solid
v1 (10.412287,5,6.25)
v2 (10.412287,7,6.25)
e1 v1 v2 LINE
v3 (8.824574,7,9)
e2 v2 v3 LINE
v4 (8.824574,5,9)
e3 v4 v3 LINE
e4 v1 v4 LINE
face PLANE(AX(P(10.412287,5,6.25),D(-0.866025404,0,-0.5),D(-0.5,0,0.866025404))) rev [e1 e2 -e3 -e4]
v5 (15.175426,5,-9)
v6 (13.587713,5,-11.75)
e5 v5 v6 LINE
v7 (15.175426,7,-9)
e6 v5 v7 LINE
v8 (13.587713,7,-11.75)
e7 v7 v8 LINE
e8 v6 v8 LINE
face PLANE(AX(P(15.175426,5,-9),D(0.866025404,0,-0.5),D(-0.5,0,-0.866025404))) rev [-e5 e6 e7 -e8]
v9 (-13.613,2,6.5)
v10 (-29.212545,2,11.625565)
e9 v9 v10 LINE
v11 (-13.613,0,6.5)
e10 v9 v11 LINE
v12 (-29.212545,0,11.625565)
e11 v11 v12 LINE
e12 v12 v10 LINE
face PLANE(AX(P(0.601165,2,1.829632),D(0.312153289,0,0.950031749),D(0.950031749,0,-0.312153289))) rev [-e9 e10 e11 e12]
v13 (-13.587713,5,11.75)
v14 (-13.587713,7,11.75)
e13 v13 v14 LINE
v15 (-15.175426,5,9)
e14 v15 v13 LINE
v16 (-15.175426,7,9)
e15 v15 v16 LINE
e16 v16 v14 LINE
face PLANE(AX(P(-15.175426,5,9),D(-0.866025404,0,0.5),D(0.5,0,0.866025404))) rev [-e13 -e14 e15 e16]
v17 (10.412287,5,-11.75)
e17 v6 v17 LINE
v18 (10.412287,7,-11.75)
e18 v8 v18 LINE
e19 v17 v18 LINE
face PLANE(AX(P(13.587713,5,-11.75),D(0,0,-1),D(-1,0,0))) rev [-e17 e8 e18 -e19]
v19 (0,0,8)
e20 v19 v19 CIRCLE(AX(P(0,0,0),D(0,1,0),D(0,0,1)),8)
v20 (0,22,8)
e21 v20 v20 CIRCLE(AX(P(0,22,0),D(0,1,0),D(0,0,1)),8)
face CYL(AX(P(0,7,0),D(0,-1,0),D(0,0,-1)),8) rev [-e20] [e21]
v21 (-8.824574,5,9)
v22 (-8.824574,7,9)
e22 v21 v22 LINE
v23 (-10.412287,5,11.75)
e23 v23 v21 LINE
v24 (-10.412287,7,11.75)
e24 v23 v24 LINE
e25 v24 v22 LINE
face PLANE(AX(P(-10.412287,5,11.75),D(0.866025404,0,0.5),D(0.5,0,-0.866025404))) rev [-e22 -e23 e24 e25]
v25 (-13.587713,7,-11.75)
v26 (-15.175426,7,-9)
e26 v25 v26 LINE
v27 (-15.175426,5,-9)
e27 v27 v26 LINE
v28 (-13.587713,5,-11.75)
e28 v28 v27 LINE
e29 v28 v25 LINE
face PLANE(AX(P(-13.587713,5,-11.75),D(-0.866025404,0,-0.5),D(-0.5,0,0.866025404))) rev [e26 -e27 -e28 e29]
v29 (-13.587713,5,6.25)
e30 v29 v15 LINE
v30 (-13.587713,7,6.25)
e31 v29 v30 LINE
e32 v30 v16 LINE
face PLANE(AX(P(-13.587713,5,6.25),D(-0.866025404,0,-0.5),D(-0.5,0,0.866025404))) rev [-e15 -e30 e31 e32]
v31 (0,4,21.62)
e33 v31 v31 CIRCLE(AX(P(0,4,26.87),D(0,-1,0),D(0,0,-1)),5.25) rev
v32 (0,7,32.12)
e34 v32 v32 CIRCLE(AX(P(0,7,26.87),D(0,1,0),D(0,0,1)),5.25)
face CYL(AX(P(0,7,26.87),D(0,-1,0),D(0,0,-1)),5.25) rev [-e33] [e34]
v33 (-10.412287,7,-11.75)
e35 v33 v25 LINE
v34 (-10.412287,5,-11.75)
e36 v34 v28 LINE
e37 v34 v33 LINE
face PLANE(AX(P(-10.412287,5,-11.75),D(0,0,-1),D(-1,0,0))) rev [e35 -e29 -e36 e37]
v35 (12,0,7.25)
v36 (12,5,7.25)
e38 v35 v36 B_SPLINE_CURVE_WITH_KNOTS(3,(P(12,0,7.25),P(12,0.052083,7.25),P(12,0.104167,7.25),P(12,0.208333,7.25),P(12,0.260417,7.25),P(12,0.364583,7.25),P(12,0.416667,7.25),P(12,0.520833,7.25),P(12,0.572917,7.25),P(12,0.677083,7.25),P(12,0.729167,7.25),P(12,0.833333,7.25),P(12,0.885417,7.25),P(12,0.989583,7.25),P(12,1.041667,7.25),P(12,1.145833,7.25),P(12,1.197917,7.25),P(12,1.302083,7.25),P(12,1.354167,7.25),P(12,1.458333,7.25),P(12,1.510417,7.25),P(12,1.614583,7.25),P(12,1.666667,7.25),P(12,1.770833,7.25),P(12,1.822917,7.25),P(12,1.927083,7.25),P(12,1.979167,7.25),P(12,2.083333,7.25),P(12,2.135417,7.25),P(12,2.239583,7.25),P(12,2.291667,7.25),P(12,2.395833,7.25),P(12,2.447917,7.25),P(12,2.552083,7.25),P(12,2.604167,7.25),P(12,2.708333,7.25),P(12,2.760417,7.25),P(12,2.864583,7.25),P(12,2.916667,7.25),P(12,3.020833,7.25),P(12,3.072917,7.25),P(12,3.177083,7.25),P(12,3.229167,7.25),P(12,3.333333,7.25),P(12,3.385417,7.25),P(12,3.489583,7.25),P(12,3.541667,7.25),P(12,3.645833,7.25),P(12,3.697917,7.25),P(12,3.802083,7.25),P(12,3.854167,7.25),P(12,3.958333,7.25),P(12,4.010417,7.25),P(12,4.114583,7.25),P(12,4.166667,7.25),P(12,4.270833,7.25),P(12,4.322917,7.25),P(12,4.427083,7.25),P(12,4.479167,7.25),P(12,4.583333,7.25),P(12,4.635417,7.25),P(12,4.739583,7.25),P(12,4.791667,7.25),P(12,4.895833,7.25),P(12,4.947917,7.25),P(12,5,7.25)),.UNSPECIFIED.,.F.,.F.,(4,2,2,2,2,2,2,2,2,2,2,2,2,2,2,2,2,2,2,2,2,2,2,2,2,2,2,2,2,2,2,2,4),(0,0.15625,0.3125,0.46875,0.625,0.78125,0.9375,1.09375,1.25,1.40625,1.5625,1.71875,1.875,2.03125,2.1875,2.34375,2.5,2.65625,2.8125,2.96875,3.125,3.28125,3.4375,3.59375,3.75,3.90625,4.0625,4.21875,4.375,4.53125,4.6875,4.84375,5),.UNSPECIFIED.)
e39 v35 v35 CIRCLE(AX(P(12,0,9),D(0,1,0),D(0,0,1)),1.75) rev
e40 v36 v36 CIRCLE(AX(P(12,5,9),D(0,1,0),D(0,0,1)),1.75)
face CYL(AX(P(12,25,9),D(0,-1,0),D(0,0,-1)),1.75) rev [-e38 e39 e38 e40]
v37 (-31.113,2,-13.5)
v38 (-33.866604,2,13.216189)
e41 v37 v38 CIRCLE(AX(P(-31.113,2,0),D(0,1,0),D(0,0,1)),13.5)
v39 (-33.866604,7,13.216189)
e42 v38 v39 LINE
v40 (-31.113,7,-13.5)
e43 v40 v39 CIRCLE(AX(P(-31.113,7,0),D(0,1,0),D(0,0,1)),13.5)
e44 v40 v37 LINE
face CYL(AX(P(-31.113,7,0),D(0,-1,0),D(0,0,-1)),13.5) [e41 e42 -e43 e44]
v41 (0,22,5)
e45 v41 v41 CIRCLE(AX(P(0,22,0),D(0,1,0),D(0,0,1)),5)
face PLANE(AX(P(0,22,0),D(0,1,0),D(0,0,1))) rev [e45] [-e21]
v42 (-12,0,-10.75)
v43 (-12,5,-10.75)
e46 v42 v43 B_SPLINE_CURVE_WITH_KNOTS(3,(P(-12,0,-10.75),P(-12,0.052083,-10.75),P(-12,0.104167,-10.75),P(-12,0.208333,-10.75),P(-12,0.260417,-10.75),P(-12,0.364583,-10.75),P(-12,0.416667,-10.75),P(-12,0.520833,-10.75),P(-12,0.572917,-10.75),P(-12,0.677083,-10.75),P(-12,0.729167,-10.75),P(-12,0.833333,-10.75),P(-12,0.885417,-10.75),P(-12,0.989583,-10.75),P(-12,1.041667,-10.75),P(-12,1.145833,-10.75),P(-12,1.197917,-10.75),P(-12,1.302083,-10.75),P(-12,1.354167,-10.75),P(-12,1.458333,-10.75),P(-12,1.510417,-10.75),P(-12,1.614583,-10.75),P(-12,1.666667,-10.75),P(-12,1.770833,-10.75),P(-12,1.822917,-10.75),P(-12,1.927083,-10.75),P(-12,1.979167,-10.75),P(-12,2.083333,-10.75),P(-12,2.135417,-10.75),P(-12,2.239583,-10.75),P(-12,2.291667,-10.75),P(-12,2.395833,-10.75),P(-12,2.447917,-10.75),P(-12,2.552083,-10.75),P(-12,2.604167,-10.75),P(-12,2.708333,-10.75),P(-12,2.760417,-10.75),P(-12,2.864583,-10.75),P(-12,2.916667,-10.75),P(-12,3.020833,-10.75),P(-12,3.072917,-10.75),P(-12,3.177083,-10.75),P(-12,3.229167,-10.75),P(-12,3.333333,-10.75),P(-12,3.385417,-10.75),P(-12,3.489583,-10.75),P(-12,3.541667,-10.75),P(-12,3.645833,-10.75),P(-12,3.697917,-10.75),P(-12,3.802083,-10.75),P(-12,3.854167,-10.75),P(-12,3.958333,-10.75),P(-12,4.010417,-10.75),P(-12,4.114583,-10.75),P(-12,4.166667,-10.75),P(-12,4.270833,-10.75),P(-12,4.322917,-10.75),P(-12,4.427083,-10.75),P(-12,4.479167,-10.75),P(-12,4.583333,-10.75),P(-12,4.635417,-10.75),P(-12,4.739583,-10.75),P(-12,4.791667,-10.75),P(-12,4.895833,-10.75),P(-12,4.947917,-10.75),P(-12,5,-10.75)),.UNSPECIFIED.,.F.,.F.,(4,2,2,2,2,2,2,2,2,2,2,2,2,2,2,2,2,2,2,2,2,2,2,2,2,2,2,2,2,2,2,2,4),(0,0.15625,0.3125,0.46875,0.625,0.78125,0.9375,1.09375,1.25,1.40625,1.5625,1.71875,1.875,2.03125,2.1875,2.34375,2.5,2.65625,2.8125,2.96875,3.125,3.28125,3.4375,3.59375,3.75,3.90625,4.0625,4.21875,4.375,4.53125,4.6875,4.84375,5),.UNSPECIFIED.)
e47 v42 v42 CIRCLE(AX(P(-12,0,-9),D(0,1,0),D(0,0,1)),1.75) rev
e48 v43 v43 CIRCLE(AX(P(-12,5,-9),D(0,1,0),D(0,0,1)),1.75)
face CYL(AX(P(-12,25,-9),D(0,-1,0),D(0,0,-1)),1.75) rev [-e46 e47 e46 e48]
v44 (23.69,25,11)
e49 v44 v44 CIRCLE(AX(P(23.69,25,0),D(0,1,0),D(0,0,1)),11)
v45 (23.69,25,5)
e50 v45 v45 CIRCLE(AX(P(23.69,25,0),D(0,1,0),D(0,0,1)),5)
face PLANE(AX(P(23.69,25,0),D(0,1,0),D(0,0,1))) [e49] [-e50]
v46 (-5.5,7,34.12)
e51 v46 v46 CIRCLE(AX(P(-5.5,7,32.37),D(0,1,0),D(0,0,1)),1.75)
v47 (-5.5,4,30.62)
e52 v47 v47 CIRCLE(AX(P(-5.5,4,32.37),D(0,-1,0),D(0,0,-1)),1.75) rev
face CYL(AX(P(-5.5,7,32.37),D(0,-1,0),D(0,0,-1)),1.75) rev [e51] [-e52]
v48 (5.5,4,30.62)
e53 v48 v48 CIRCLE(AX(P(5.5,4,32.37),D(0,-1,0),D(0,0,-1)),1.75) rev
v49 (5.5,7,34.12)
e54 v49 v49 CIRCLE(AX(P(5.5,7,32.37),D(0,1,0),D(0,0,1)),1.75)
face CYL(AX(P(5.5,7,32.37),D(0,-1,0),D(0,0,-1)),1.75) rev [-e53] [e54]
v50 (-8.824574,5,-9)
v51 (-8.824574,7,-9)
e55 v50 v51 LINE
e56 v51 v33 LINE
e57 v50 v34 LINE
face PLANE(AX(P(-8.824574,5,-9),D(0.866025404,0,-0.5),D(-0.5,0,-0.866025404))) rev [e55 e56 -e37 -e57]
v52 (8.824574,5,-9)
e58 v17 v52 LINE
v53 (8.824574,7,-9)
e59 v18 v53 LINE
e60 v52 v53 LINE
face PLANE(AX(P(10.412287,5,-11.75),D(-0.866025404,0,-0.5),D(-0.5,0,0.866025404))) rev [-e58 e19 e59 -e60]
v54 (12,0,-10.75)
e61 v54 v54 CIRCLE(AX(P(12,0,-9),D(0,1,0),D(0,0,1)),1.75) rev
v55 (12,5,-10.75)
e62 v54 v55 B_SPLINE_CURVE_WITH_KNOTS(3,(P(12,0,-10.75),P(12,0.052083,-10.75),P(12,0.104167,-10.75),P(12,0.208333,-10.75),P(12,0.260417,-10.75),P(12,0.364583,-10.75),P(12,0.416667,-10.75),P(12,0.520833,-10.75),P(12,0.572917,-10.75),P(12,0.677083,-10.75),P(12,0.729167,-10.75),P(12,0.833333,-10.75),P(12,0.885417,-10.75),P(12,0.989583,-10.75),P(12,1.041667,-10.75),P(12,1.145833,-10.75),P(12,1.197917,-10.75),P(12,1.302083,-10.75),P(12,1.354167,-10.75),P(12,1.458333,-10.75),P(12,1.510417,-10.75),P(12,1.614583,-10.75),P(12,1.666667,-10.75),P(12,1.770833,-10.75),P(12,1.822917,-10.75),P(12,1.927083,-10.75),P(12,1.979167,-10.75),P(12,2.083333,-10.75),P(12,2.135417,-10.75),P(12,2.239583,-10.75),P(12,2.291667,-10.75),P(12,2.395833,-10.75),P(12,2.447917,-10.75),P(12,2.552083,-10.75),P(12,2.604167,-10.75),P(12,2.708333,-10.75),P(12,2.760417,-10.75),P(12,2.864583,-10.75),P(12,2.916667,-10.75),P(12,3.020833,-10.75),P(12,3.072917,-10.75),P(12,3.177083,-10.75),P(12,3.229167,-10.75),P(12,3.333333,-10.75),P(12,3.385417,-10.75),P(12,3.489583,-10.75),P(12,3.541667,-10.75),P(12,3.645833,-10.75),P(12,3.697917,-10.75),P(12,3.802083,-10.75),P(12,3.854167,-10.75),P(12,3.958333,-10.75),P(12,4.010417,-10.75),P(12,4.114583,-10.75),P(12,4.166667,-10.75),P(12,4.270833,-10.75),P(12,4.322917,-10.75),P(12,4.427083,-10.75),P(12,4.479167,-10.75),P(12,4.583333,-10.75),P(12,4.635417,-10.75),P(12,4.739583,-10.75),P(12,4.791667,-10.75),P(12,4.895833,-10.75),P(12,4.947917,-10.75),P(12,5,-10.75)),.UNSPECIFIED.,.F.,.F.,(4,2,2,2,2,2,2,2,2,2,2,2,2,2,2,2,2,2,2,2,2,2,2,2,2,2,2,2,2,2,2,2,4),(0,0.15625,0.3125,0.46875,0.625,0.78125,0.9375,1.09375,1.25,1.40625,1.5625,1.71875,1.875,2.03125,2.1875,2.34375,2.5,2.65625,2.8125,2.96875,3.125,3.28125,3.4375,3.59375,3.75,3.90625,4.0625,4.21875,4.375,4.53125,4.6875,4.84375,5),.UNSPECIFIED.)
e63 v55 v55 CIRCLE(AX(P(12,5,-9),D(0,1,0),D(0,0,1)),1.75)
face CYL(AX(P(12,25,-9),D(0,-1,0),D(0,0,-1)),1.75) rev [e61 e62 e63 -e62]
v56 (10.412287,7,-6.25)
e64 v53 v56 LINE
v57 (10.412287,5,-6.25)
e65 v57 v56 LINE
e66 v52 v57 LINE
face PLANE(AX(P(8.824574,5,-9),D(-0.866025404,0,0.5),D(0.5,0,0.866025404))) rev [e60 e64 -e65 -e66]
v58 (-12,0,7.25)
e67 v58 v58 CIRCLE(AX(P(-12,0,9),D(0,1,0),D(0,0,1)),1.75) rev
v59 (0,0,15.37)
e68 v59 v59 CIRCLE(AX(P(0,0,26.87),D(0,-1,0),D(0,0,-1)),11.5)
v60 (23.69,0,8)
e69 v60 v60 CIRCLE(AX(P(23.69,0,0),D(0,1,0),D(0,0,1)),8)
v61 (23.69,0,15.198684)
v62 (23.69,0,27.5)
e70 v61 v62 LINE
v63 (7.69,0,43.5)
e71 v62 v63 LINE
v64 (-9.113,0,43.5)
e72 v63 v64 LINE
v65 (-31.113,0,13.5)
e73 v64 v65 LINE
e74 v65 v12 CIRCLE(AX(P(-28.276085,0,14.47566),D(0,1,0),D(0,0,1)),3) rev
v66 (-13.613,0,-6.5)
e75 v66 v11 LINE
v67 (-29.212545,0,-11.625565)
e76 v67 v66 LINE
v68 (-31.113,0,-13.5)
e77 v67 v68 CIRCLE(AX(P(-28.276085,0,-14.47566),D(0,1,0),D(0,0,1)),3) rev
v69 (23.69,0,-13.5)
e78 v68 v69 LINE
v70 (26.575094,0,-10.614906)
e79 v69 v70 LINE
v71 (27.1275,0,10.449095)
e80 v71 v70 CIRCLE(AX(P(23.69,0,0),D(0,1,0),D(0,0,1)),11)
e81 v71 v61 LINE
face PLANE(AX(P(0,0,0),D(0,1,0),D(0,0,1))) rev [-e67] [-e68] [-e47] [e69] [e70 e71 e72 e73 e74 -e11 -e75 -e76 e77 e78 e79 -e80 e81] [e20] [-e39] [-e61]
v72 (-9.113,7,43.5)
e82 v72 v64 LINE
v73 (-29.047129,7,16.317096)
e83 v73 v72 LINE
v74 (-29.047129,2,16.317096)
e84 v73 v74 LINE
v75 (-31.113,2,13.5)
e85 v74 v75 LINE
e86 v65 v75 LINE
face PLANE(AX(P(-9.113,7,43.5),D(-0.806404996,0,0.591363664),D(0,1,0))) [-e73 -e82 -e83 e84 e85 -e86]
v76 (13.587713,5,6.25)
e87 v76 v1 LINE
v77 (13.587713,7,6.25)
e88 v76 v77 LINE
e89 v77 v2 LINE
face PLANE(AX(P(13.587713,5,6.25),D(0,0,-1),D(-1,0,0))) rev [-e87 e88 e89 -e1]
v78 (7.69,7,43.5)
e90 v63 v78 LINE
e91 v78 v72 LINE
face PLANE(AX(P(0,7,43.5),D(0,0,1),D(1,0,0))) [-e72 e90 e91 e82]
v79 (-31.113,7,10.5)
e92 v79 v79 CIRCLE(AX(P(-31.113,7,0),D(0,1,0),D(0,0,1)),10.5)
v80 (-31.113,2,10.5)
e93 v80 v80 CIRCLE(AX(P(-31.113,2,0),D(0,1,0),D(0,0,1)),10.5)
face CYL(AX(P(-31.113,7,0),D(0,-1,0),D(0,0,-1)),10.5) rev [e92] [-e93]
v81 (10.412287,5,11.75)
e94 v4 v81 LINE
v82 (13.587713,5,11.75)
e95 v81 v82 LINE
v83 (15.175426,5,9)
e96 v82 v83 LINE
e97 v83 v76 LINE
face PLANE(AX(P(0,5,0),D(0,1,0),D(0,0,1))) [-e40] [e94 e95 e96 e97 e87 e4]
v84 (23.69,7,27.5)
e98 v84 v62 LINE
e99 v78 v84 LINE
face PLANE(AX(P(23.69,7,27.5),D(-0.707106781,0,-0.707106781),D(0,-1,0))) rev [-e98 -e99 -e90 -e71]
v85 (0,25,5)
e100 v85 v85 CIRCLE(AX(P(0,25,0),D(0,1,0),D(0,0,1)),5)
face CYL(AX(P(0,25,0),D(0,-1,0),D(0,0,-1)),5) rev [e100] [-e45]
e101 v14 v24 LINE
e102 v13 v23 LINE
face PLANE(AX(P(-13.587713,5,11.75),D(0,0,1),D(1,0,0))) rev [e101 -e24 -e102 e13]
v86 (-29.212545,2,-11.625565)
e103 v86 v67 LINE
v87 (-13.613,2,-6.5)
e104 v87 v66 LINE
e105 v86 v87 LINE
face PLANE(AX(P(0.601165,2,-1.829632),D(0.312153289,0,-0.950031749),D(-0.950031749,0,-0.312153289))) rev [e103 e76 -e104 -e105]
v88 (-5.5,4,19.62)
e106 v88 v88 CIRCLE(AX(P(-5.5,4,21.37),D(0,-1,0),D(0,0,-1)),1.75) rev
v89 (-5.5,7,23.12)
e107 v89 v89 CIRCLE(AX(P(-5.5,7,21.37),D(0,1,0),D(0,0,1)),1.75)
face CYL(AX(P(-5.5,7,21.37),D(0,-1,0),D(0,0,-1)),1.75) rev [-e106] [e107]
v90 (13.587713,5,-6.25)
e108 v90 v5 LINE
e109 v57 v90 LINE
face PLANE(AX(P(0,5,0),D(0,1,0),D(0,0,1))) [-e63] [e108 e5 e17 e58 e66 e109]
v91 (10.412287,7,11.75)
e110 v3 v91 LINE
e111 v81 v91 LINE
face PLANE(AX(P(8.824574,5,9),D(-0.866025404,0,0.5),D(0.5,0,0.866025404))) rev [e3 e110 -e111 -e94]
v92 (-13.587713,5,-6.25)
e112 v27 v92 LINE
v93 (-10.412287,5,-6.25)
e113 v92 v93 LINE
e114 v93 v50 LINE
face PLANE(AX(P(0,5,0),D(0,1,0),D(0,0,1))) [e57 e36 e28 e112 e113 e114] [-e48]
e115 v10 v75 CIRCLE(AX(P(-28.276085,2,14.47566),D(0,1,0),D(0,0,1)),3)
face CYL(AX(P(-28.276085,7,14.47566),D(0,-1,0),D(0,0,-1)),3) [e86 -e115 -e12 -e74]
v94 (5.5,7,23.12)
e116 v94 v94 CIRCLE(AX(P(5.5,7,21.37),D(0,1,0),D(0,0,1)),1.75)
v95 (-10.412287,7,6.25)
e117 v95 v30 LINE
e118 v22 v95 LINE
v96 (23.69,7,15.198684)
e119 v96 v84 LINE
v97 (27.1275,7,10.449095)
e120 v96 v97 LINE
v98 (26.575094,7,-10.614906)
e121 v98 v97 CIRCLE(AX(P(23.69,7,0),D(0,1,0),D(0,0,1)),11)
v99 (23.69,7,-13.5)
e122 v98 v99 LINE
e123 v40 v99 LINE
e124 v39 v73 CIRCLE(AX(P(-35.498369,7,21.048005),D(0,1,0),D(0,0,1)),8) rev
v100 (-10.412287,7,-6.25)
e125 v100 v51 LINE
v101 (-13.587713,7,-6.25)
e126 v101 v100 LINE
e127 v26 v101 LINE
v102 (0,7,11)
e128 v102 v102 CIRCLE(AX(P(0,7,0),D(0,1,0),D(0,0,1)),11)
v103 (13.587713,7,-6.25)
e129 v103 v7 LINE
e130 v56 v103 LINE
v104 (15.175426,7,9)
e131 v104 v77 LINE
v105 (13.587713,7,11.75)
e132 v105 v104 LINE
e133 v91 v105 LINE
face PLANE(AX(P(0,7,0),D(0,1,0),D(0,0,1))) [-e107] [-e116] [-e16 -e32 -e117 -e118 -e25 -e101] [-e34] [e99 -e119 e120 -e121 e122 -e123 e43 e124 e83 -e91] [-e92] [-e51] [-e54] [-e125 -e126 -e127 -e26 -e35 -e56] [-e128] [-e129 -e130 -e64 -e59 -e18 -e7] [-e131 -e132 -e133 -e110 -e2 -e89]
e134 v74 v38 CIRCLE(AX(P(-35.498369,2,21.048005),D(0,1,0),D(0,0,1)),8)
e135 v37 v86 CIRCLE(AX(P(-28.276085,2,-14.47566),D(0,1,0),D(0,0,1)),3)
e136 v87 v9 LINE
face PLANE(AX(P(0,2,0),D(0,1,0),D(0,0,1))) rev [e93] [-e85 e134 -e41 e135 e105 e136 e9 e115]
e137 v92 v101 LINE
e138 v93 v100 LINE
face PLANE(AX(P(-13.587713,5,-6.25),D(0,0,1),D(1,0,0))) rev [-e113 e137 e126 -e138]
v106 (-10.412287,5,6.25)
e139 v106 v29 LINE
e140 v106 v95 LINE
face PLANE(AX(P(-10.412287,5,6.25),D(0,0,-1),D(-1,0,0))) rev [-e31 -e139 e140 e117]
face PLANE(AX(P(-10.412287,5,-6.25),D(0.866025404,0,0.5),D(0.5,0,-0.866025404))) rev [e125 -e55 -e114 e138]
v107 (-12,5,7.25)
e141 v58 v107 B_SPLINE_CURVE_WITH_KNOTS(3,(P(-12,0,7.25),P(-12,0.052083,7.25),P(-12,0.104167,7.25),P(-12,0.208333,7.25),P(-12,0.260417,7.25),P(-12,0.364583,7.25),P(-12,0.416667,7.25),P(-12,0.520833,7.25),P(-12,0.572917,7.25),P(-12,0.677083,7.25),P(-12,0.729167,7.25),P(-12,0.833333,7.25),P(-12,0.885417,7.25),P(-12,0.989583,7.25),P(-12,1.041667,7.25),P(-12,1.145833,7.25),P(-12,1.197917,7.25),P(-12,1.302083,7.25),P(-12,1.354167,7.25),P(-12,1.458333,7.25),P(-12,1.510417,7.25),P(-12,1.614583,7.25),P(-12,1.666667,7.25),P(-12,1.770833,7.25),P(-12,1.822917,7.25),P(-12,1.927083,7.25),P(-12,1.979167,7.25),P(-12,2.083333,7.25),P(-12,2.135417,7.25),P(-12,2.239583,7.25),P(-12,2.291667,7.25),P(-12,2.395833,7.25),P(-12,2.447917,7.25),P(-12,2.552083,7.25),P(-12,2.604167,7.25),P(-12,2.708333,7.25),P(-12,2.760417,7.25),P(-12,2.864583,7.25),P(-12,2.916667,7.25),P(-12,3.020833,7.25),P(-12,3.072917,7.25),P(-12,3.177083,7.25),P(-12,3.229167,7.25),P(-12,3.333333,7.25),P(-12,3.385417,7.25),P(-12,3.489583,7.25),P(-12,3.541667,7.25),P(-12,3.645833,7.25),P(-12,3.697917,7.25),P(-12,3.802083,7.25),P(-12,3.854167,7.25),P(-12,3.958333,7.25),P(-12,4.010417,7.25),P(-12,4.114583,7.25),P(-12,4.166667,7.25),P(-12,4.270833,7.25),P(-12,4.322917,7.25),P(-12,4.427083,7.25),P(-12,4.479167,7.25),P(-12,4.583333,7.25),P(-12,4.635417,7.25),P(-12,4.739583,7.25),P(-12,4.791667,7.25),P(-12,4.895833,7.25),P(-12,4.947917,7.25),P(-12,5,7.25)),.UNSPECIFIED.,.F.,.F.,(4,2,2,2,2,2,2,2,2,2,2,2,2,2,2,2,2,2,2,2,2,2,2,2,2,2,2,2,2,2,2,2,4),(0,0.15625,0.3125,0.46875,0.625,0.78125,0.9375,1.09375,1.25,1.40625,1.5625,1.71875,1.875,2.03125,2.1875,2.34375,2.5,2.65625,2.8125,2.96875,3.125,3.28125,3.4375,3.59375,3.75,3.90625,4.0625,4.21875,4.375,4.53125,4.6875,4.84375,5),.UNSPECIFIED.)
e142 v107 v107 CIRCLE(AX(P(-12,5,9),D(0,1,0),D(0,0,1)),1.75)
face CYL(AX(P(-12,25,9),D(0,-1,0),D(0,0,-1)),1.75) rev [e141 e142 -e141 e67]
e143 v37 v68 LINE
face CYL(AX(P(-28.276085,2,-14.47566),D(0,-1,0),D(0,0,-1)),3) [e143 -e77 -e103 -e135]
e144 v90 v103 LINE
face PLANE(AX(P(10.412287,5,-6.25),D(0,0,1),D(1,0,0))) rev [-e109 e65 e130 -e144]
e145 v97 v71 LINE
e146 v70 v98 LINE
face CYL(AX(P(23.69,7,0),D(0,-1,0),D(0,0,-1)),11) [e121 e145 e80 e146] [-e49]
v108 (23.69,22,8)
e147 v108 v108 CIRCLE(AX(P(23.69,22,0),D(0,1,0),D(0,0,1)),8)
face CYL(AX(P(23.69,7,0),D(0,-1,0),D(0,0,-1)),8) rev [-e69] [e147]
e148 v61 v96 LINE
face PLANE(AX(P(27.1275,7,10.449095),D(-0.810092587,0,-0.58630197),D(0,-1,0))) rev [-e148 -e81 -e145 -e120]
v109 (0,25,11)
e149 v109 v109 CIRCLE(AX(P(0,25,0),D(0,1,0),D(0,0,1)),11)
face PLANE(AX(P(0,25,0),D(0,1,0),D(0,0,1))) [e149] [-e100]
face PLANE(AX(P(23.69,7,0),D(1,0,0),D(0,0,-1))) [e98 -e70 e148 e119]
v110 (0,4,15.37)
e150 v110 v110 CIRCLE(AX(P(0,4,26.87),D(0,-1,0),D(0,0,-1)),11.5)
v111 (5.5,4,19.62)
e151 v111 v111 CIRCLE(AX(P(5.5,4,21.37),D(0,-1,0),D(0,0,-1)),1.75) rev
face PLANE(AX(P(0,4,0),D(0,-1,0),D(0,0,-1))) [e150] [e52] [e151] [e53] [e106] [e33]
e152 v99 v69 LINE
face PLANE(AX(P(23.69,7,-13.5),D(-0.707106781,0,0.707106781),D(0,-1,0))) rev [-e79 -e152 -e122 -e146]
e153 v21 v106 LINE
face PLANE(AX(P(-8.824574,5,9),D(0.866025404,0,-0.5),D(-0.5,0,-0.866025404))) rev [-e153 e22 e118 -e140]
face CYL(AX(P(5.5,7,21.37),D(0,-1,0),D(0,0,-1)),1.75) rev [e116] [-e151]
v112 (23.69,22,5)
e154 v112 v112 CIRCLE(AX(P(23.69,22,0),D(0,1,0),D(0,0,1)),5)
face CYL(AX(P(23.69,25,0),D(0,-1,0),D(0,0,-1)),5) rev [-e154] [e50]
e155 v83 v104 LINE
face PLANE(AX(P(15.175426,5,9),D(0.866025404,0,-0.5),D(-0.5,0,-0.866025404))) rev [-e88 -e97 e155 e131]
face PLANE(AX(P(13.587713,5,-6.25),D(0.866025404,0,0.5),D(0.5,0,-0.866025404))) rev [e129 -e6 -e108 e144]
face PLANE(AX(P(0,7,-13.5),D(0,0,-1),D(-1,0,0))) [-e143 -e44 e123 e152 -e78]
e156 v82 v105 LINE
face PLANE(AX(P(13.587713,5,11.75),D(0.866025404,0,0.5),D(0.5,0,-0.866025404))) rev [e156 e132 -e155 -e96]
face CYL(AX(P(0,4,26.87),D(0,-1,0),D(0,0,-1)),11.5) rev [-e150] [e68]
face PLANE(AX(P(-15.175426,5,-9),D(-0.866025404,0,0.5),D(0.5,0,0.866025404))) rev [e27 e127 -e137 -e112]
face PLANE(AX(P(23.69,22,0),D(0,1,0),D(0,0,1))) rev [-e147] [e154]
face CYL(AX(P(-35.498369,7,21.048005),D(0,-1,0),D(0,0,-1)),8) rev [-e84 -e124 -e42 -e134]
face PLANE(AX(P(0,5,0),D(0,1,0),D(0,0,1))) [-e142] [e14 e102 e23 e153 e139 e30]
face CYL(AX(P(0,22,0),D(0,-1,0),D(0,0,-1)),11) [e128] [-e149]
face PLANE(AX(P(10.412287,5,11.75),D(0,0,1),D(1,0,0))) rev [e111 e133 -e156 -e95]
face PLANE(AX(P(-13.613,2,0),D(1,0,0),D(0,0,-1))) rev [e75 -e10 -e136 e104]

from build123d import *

# Parameters (mm, degrees)
SKETCH3_R               = 8
SKETCH3_W               = 54.803
SKETCH3_H               = 30
SKETCH3_R_2             = 5.25
BOSS_EXTRUDE1_DEPTH     = 7
CUT_EXTRUDE3_DEPTH      = 63.702230973
CUT_EXTRUDE3_DEPTH_BACK = 63.702230973
SKETCH4_R               = 1.75
SKETCH6_R               = 11
SKETCH6_R_2             = 8
BOSS_EXTRUDE2_DEPTH     = 15
SKETCH7_R               = 11
SKETCH7_R_2             = 5
BOSS_EXTRUDE3_DEPTH     = 3
CHAMFER1_SIZE           = 2.5
CUT_EXTRUDE4_DEPTH      = 2
CUT_EXTRUDE5_DEPTH      = 68.138437344
CUT_EXTRUDE5_DEPTH_BACK = 68.138437344
SKETCH9_R               = 1.75
CUT_EXTRUDE6_START      = -2
SKETCH10_R              = 1.75
CUT_EXTRUDE6_DEPTH      = 2
CHAMFER3_SIZE           = 30
CHAMFER3_SIZE2          = 22
CHAMFER4_SIZE           = 16
FILLET1_R               = 8
SKETCH14_R              = 11.5
SKETCH14_R_2            = 5.25
SKETCH14_R_3            = 1.75
CUT_EXTRUDE8_DEPTH      = 4
FILLET2_R               = 3


with BuildPart() as part:
    # Sketch3 → Boss-Extrude1 (new body)
    # profile 1 of 10: a face of its own
    with BuildSketch(Plane(origin=(0, 0, 0), x_dir=(1, 0, 0), z_dir=(0, 1, 0))):
        with BuildLine():
            ThreePointArc((-17.613, 0), (-21.567058454, 9.545941546), (-31.113, 13.5))
            Line((-31.113, 13.5), (-31.113, 10.5))
            ThreePointArc((-31.113, 10.5), (-23.688378798, 7.424621202), (-20.613, 0))
            ThreePointArc((-20.613, 0), (-23.688378798, -7.424621202), (-31.113, -10.5))
            Line((-31.113, -10.5), (-31.113, -13.5))
            ThreePointArc((-31.113, -13.5), (-21.567058454, -9.545941546), (-17.613, 0))
        make_face()
    # profile 2 of 10: a face of its own
    with BuildSketch(Plane(origin=(0, 0, 0), x_dir=(1, 0, 0), z_dir=(0, 1, 0))):
        with BuildLine():
            Line((-31.113, 10.5), (-31.113, 13.5))
            ThreePointArc((-31.113, 13.5), (-44.613, 0), (-31.113, -13.5))
            Line((-31.113, -13.5), (-31.113, -10.5))
            ThreePointArc((-31.113, -10.5), (-41.613, 0), (-31.113, 10.5))
        make_face()
    # profile 3 of 10: a face of its own
    with BuildSketch(Plane(origin=(0, 0, 0), x_dir=(1, 0, 0), z_dir=(0, 1, 0))):
        with BuildLine():
            Line((23.69, 13.5), (-31.113, 13.5))
            ThreePointArc((-31.113, 13.5), (-21.567058454, 9.545941546), (-17.613, 0))
            ThreePointArc((-17.613, 0), (-21.567058454, -9.545941546), (-31.113, -13.5))
            Line((-31.113, -13.5), (23.69, -13.5))
            Line((23.69, -13.5), (23.69, -11))
            ThreePointArc((23.69, -11), (12.69, 0), (23.69, 11))
            Line((23.69, 11), (23.69, 13.5))
        make_face()
        with Locations(Location((0, 0, 0), (0, 0, 270))):
            Circle(SKETCH3_R, mode=Mode.SUBTRACT)
    # profile 4 of 10: a face of its own
    with BuildSketch(Plane(origin=(0, 0, 0), x_dir=(1, 0, 0), z_dir=(0, 1, 0))):
        with BuildLine():
            ThreePointArc((-17.613, 0), (-21.567058454, 9.545941546), (-31.113, 13.5))
            Line((-31.113, 13.5), (-31.113, 10.5))
            ThreePointArc((-31.113, 10.5), (-23.688378798, 7.424621202), (-20.613, 0))
            ThreePointArc((-20.613, 0), (-23.688378798, -7.424621202), (-31.113, -10.5))
            Line((-31.113, -10.5), (-31.113, -13.5))
            ThreePointArc((-31.113, -13.5), (-21.567058454, -9.545941546), (-17.613, 0))
        make_face()
    # profile 5 of 10: a face of its own
    with BuildSketch(Plane(origin=(0, 0, 0), x_dir=(1, 0, 0), z_dir=(0, 1, 0))):
        with BuildLine():
            Line((-31.113, 10.5), (-31.113, 13.5))
            ThreePointArc((-31.113, 13.5), (-44.613, 0), (-31.113, -13.5))
            Line((-31.113, -13.5), (-31.113, -10.5))
            ThreePointArc((-31.113, -10.5), (-41.613, 0), (-31.113, 10.5))
        make_face()
    # profile 6 of 10: a face of its own
    with BuildSketch(Plane(origin=(0, 0, 0), x_dir=(1, 0, 0), z_dir=(0, 1, 0))):
        with BuildLine():
            ThreePointArc((34.69, 0), (31.468174593, 7.778174593), (23.69, 11))
            Line((23.69, 11), (23.69, 8))
            ThreePointArc((23.69, 8), (29.346854249, 5.656854249), (31.69, 0))
            ThreePointArc((31.69, 0), (29.346854249, -5.656854249), (23.69, -8))
            Line((23.69, -8), (23.69, -11))
            ThreePointArc((23.69, -11), (31.468174593, -7.778174593), (34.69, 0))
        make_face()
    # profile 7 of 10: a face of its own
    with BuildSketch(Plane(origin=(0, 0, 0), x_dir=(1, 0, 0), z_dir=(0, 1, 0))):
        with BuildLine():
            Line((23.69, 8), (23.69, 11))
            ThreePointArc((23.69, 11), (12.69, 0), (23.69, -11))
            Line((23.69, -11), (23.69, -8))
            ThreePointArc((23.69, -8), (15.69, 0), (23.69, 8))
        make_face()
    # profile 8 of 10: a face of its own
    with BuildSketch(Plane(origin=(0, 0, 0), x_dir=(1, 0, 0), z_dir=(0, 1, 0))):
        with Locations((-3.7115, -28.5)):
            Rectangle(SKETCH3_W, SKETCH3_H)
        with Locations(Location((0, -26.87, 0), (0, 0, 270))):
            Circle(SKETCH3_R_2, mode=Mode.SUBTRACT)
    # profile 9 of 10: a face of its own
    with BuildSketch(Plane(origin=(0, 0, 0), x_dir=(1, 0, 0), z_dir=(0, 1, 0))):
        with BuildLine():
            ThreePointArc((34.69, 0), (31.468174593, 7.778174593), (23.69, 11))
            Line((23.69, 11), (23.69, 8))
            ThreePointArc((23.69, 8), (29.346854249, 5.656854249), (31.69, 0))
            ThreePointArc((31.69, 0), (29.346854249, -5.656854249), (23.69, -8))
            Line((23.69, -8), (23.69, -11))
            ThreePointArc((23.69, -11), (31.468174593, -7.778174593), (34.69, 0))
        make_face()
    # profile 10 of 10: a face of its own
    with BuildSketch(Plane(origin=(0, 0, 0), x_dir=(1, 0, 0), z_dir=(0, 1, 0))):
        with BuildLine():
            Line((23.69, 8), (23.69, 11))
            ThreePointArc((23.69, 11), (12.69, 0), (23.69, -11))
            Line((23.69, -11), (23.69, -8))
            ThreePointArc((23.69, -8), (15.69, 0), (23.69, 8))
        make_face()
    extrude(amount=BOSS_EXTRUDE1_DEPTH)

    # Sketch4 → Cut-Extrude3 (cut, two sides: drawn at the far end of the back side and taken through both)
    with BuildSketch(Plane(origin=(0, 0, 0), x_dir=(1, 0, 0), z_dir=(0, 1, 0)).offset(-CUT_EXTRUDE3_DEPTH_BACK)):
        with Locations(Location((5.5, -21.37, 0), (0, 0, 270))):
            Circle(SKETCH4_R)
        with Locations(Location((5.5, -32.37, 0), (0, 0, 270))):
            Circle(SKETCH4_R)
        with Locations(Location((-5.5, -32.37, 0), (0, 0, 270))):
            Circle(SKETCH4_R)
        with Locations(Location((-5.5, -21.37, 0), (0, 0, 270))):
            Circle(SKETCH4_R)
    extrude(amount=CUT_EXTRUDE3_DEPTH + CUT_EXTRUDE3_DEPTH_BACK, mode=Mode.SUBTRACT)

    # Sketch6 → Boss-Extrude2 (add)
    # profile 1 of 2: a face of its own
    with BuildSketch(Plane(origin=(0, 7, 0), x_dir=(1, 0, 0), z_dir=(0, 1, 0))):
        with Locations(Location((23.69, 0, 0), (0, 0, 270))):
            Circle(SKETCH6_R)
        with Locations(Location((23.69, 0, 0), (0, 0, 270))):
            Circle(SKETCH6_R_2, mode=Mode.SUBTRACT)
    # profile 2 of 2: a face of its own
    with BuildSketch(Plane(origin=(0, 7, 0), x_dir=(1, 0, 0), z_dir=(0, 1, 0))):
        with Locations(Location((0, 0, 0), (0, 0, 270))):
            Circle(SKETCH6_R)
        with Locations(Location((0, 0, 0), (0, 0, 270))):
            Circle(SKETCH6_R_2, mode=Mode.SUBTRACT)
    extrude(amount=BOSS_EXTRUDE2_DEPTH)

    # Sketch7 → Boss-Extrude3 (add)
    # profile 1 of 2: a face of its own
    with BuildSketch(Plane(origin=(0, 22, 0), x_dir=(1, 0, 0), z_dir=(0, 1, 0))):
        with Locations(Location((23.69, 0, 0), (0, 0, 270))):
            Circle(SKETCH7_R)
        with Locations(Location((23.69, 0, 0), (0, 0, 270))):
            Circle(SKETCH7_R_2, mode=Mode.SUBTRACT)
    # profile 2 of 2: a face of its own
    with BuildSketch(Plane(origin=(0, 22, 0), x_dir=(1, 0, 0), z_dir=(0, 1, 0))):
        with Locations(Location((0, 0, 0), (0, 0, 270))):
            Circle(SKETCH7_R)
        with Locations(Location((0, 0, 0), (0, 0, 270))):
            Circle(SKETCH7_R_2, mode=Mode.SUBTRACT)
    extrude(amount=BOSS_EXTRUDE3_DEPTH)

    # Chamfer1
    # the kernel refuses this chamfer: 2.5 mm, written as the material it adds along each edge
    with BuildSketch(Plane(origin=(23.69, 0, -11), x_dir=(0.9912092295509807, 0, 0.13230367815352426), z_dir=(0, 1, 0))) as chamfer1_piece_1_section:
        with BuildLine():
            Line((2.910680919, 0), (-CHAMFER1_SIZE * 0.132303678154, CHAMFER1_SIZE * 0.991209229551))
            Line((-CHAMFER1_SIZE * 0.132303678154, CHAMFER1_SIZE * 0.991209229551), (0, 0))
            ThreePointArc((0, 0), (1.49552658, 0.096625069), (2.910680919, 0))
        make_face()
    chamfer1_piece_1 = extrude(amount=7, mode=Mode.PRIVATE)
    chamfer1_piece_1 = split(chamfer1_piece_1, bisect_by=Plane(origin=(23.69, 0, -13.5), z_dir=(0, 0, 1)), keep=Keep.TOP, mode=Mode.PRIVATE)
    add(chamfer1_piece_1)

    # Sketch8 → Cut-Extrude4 (cut)
    with BuildSketch(Plane(origin=(0, 0, 0), x_dir=(1, 0, 0), z_dir=(0, 1, 0))):
        Polygon((-31.113, -12.25), (-31.113, 0), (-31.113, 12.25), (-31.113, 13.5), (-51.113, 13.5), (-51.113, -13.5), (-31.113, -13.5), align=None)
        Polygon((-31.113, 12.25), (-31.113, 0), (-31.113, -12.25), (-13.613, -6.5), (-13.613, 6.5), align=None)
    extrude(amount=CUT_EXTRUDE4_DEPTH, mode=Mode.SUBTRACT)

    # Sketch9 → Cut-Extrude5 (cut, two sides: drawn at the far end of the back side and taken through both)
    with BuildSketch(Plane(origin=(0, 0, 0), x_dir=(1, 0, 0), z_dir=(0, 1, 0)).offset(-CUT_EXTRUDE5_DEPTH_BACK)):
        with Locations(Location((12, 9, 0), (0, 0, 90))):
            Circle(SKETCH9_R)
        with Locations(Location((12, -9, 0), (0, 0, 90))):
            Circle(SKETCH9_R)
        with Locations(Location((-12, -9, 0), (0, 0, 90))):
            Circle(SKETCH9_R)
        with Locations(Location((-12, 9, 0), (0, 0, 90))):
            Circle(SKETCH9_R)
    extrude(amount=CUT_EXTRUDE5_DEPTH + CUT_EXTRUDE5_DEPTH_BACK, mode=Mode.SUBTRACT)

    # Sketch10 → Cut-Extrude6 (cut)
    # profile 1 of 4: a face of its own
    with BuildSketch(Plane(origin=(0, 7, 0), x_dir=(1, 0, 0), z_dir=(0, 1, 0)).offset(CUT_EXTRUDE6_START)):
        Polygon((-15.175426481, -9), (-13.58771324, -11.75), (-10.41228676, -11.75), (-8.824573519, -9), (-10.41228676, -6.25), (-13.58771324, -6.25), align=None)
        with Locations(Location((-12, -9, 0), (0, 0, 90))):
            Circle(SKETCH10_R, mode=Mode.SUBTRACT)
    # profile 2 of 4: a face of its own
    with BuildSketch(Plane(origin=(0, 7, 0), x_dir=(1, 0, 0), z_dir=(0, 1, 0)).offset(CUT_EXTRUDE6_START)):
        Polygon((-15.175426481, 9), (-13.58771324, 6.25), (-10.41228676, 6.25), (-8.824573519, 9), (-10.41228676, 11.75), (-13.58771324, 11.75), align=None)
        with Locations(Location((-12, 9, 0), (0, 0, 90))):
            Circle(SKETCH10_R, mode=Mode.SUBTRACT)
    # profile 3 of 4: a face of its own
    with BuildSketch(Plane(origin=(0, 7, 0), x_dir=(1, 0, 0), z_dir=(0, 1, 0)).offset(CUT_EXTRUDE6_START)):
        Polygon((15.175426481, 9), (13.58771324, 11.75), (10.41228676, 11.75), (8.824573519, 9), (10.41228676, 6.25), (13.58771324, 6.25), align=None)
        with Locations(Location((12, 9, 0), (0, 0, 90))):
            Circle(SKETCH10_R, mode=Mode.SUBTRACT)
    # profile 4 of 4: a face of its own
    with BuildSketch(Plane(origin=(0, 7, 0), x_dir=(1, 0, 0), z_dir=(0, 1, 0)).offset(CUT_EXTRUDE6_START)):
        Polygon((15.175426481, -9), (13.58771324, -6.25), (10.41228676, -6.25), (8.824573519, -9), (10.41228676, -11.75), (13.58771324, -11.75), align=None)
        with Locations(Location((12, -9, 0), (0, 0, 90))):
            Circle(SKETCH10_R, mode=Mode.SUBTRACT)
    extrude(amount=CUT_EXTRUDE6_DEPTH, mode=Mode.SUBTRACT)

    # Chamfer2
    # the kernel refuses this chamfer: 5 mm, written as the material it adds along each edge
    with BuildSketch(Plane(origin=(23.69, 0, 11), x_dir=(0.9874000606639179, 0, -0.15824386307497393), z_dir=(0, 1, 0))) as chamfer2_piece_1:
        with BuildLine():
            Line((3.622786344, 0.141421356), (-0.805837357, -4.287202344))
            Line((-0.805837357, -4.287202344), (-0.904577363, -4.271377958))
            ThreePointArc((-0.904577363, -4.271377958), (-0.443767224, -2.137054655), (-0.098740006, 0.015824386))
            Line((-0.098740006, 0.015824386), (0.015824386, 0.098740006))
            ThreePointArc((0.015824386, 0.098740006), (1.81210794, -0.038365312), (3.606961958, 0.240161362))
            Line((3.606961958, 0.240161362), (3.622786344, 0.141421356))
        make_face()
    extrude(amount=7)

    # Chamfer3
    chamfer3_edges = [part.edges().sort_by_distance(p)[0] for p in [
        (-31.113, 3.5, 43.5),
    ]]
    chamfer3_side = [part.faces().sort_by_distance(p)[0] for p in [
        (-31.113, 3.470588235, 28.316176471),
    ]]
    chamfer(chamfer3_edges, length=CHAMFER3_SIZE, length2=CHAMFER3_SIZE2, reference=chamfer3_side[0])

    # Chamfer4
    chamfer4_edges = [part.edges().sort_by_distance(p)[0] for p in [
        (23.69, 3.5, 43.5),
    ]]
    chamfer(chamfer4_edges, length=CHAMFER4_SIZE)

    # Fillet1
    fillet1_edges = [part.edges().sort_by_distance(p)[0] for p in [
        (-31.113, 4.5, 13.5),
    ]]
    fillet(fillet1_edges, radius=FILLET1_R)

    # Sketch14 → Cut-Extrude8 (cut)
    with BuildSketch(Plane.XZ):
        with Locations(Location((0, 26.87, 0), (0, 0, 270))):
            Circle(SKETCH14_R)
        with Locations(Location((0, 26.87, 0), (0, 0, 270))):
            Circle(SKETCH14_R_2, mode=Mode.SUBTRACT)
        with Locations(Location((5.5, 32.37, 0), (0, 0, 270))):
            Circle(SKETCH14_R_3, mode=Mode.SUBTRACT)
        with Locations(Location((-5.5, 21.37, 0), (0, 0, 270))):
            Circle(SKETCH14_R_3, mode=Mode.SUBTRACT)
        with Locations(Location((-5.5, 32.37, 0), (0, 0, 270))):
            Circle(SKETCH14_R_3, mode=Mode.SUBTRACT)
        with Locations(Location((5.5, 21.37, 0), (0, 0, 270))):
            Circle(SKETCH14_R_3, mode=Mode.SUBTRACT)
    extrude(amount=-CUT_EXTRUDE8_DEPTH, mode=Mode.SUBTRACT)

    # Fillet2
    # the kernel refuses this fillet: 3 mm, written as the material it takes off along each edge
    with BuildSketch(Plane(origin=(-31.113, -5.001031038, -12.25), x_dir=(0.9500317490404903, 0, 0.3121532889704462), z_dir=(0, 1, 0))) as fillet2_piece_1:
        with BuildLine():
            CenterArc((2.000412415, 3), FILLET2_R, 217.167948486, 52.832051514)
            Line((-0.390191611, 1.187539686), (-0.438003692, 1.15129048))
            ThreePointArc((-0.438003692, 1.15129048), (-0.252097711, 0.575040646), (-0.057001905, -0.018729197))
            Line((-0.057001905, -0.018729197), (0, -0.06))
            Line((0, -0.06), (2.000412415, -0.06))
            Line((2.000412415, -0.06), (2.000412415, 0))
        make_face()
    extrude(amount=7.001031038, mode=Mode.SUBTRACT)
    with BuildSketch(Plane(origin=(-31.113, -5.001031038, 12.25), x_dir=(0, 0, 1), z_dir=(0, 1, 0))) as fillet2_piece_2:
        with BuildLine():
            CenterArc((2.225659932, 2.836915173), FILLET2_R, 198.1890457, 52.832051514)
            Line((-0.624435315, 1.900455306), (-0.68143722, 1.881726108))
            Line((-0.68143722, 1.881726108), (-0.057001905, -0.018729197))
            Line((-0.057001905, -0.018729197), (0, -0.06))
            ThreePointArc((0, -0.06), (0.625, -0.06), (1.230486801, -0.056738303))
            Line((1.230486801, -0.056738303), (1.25, 0))
        make_face()
    extrude(amount=7.001031038, mode=Mode.SUBTRACT)


solid = part.part
